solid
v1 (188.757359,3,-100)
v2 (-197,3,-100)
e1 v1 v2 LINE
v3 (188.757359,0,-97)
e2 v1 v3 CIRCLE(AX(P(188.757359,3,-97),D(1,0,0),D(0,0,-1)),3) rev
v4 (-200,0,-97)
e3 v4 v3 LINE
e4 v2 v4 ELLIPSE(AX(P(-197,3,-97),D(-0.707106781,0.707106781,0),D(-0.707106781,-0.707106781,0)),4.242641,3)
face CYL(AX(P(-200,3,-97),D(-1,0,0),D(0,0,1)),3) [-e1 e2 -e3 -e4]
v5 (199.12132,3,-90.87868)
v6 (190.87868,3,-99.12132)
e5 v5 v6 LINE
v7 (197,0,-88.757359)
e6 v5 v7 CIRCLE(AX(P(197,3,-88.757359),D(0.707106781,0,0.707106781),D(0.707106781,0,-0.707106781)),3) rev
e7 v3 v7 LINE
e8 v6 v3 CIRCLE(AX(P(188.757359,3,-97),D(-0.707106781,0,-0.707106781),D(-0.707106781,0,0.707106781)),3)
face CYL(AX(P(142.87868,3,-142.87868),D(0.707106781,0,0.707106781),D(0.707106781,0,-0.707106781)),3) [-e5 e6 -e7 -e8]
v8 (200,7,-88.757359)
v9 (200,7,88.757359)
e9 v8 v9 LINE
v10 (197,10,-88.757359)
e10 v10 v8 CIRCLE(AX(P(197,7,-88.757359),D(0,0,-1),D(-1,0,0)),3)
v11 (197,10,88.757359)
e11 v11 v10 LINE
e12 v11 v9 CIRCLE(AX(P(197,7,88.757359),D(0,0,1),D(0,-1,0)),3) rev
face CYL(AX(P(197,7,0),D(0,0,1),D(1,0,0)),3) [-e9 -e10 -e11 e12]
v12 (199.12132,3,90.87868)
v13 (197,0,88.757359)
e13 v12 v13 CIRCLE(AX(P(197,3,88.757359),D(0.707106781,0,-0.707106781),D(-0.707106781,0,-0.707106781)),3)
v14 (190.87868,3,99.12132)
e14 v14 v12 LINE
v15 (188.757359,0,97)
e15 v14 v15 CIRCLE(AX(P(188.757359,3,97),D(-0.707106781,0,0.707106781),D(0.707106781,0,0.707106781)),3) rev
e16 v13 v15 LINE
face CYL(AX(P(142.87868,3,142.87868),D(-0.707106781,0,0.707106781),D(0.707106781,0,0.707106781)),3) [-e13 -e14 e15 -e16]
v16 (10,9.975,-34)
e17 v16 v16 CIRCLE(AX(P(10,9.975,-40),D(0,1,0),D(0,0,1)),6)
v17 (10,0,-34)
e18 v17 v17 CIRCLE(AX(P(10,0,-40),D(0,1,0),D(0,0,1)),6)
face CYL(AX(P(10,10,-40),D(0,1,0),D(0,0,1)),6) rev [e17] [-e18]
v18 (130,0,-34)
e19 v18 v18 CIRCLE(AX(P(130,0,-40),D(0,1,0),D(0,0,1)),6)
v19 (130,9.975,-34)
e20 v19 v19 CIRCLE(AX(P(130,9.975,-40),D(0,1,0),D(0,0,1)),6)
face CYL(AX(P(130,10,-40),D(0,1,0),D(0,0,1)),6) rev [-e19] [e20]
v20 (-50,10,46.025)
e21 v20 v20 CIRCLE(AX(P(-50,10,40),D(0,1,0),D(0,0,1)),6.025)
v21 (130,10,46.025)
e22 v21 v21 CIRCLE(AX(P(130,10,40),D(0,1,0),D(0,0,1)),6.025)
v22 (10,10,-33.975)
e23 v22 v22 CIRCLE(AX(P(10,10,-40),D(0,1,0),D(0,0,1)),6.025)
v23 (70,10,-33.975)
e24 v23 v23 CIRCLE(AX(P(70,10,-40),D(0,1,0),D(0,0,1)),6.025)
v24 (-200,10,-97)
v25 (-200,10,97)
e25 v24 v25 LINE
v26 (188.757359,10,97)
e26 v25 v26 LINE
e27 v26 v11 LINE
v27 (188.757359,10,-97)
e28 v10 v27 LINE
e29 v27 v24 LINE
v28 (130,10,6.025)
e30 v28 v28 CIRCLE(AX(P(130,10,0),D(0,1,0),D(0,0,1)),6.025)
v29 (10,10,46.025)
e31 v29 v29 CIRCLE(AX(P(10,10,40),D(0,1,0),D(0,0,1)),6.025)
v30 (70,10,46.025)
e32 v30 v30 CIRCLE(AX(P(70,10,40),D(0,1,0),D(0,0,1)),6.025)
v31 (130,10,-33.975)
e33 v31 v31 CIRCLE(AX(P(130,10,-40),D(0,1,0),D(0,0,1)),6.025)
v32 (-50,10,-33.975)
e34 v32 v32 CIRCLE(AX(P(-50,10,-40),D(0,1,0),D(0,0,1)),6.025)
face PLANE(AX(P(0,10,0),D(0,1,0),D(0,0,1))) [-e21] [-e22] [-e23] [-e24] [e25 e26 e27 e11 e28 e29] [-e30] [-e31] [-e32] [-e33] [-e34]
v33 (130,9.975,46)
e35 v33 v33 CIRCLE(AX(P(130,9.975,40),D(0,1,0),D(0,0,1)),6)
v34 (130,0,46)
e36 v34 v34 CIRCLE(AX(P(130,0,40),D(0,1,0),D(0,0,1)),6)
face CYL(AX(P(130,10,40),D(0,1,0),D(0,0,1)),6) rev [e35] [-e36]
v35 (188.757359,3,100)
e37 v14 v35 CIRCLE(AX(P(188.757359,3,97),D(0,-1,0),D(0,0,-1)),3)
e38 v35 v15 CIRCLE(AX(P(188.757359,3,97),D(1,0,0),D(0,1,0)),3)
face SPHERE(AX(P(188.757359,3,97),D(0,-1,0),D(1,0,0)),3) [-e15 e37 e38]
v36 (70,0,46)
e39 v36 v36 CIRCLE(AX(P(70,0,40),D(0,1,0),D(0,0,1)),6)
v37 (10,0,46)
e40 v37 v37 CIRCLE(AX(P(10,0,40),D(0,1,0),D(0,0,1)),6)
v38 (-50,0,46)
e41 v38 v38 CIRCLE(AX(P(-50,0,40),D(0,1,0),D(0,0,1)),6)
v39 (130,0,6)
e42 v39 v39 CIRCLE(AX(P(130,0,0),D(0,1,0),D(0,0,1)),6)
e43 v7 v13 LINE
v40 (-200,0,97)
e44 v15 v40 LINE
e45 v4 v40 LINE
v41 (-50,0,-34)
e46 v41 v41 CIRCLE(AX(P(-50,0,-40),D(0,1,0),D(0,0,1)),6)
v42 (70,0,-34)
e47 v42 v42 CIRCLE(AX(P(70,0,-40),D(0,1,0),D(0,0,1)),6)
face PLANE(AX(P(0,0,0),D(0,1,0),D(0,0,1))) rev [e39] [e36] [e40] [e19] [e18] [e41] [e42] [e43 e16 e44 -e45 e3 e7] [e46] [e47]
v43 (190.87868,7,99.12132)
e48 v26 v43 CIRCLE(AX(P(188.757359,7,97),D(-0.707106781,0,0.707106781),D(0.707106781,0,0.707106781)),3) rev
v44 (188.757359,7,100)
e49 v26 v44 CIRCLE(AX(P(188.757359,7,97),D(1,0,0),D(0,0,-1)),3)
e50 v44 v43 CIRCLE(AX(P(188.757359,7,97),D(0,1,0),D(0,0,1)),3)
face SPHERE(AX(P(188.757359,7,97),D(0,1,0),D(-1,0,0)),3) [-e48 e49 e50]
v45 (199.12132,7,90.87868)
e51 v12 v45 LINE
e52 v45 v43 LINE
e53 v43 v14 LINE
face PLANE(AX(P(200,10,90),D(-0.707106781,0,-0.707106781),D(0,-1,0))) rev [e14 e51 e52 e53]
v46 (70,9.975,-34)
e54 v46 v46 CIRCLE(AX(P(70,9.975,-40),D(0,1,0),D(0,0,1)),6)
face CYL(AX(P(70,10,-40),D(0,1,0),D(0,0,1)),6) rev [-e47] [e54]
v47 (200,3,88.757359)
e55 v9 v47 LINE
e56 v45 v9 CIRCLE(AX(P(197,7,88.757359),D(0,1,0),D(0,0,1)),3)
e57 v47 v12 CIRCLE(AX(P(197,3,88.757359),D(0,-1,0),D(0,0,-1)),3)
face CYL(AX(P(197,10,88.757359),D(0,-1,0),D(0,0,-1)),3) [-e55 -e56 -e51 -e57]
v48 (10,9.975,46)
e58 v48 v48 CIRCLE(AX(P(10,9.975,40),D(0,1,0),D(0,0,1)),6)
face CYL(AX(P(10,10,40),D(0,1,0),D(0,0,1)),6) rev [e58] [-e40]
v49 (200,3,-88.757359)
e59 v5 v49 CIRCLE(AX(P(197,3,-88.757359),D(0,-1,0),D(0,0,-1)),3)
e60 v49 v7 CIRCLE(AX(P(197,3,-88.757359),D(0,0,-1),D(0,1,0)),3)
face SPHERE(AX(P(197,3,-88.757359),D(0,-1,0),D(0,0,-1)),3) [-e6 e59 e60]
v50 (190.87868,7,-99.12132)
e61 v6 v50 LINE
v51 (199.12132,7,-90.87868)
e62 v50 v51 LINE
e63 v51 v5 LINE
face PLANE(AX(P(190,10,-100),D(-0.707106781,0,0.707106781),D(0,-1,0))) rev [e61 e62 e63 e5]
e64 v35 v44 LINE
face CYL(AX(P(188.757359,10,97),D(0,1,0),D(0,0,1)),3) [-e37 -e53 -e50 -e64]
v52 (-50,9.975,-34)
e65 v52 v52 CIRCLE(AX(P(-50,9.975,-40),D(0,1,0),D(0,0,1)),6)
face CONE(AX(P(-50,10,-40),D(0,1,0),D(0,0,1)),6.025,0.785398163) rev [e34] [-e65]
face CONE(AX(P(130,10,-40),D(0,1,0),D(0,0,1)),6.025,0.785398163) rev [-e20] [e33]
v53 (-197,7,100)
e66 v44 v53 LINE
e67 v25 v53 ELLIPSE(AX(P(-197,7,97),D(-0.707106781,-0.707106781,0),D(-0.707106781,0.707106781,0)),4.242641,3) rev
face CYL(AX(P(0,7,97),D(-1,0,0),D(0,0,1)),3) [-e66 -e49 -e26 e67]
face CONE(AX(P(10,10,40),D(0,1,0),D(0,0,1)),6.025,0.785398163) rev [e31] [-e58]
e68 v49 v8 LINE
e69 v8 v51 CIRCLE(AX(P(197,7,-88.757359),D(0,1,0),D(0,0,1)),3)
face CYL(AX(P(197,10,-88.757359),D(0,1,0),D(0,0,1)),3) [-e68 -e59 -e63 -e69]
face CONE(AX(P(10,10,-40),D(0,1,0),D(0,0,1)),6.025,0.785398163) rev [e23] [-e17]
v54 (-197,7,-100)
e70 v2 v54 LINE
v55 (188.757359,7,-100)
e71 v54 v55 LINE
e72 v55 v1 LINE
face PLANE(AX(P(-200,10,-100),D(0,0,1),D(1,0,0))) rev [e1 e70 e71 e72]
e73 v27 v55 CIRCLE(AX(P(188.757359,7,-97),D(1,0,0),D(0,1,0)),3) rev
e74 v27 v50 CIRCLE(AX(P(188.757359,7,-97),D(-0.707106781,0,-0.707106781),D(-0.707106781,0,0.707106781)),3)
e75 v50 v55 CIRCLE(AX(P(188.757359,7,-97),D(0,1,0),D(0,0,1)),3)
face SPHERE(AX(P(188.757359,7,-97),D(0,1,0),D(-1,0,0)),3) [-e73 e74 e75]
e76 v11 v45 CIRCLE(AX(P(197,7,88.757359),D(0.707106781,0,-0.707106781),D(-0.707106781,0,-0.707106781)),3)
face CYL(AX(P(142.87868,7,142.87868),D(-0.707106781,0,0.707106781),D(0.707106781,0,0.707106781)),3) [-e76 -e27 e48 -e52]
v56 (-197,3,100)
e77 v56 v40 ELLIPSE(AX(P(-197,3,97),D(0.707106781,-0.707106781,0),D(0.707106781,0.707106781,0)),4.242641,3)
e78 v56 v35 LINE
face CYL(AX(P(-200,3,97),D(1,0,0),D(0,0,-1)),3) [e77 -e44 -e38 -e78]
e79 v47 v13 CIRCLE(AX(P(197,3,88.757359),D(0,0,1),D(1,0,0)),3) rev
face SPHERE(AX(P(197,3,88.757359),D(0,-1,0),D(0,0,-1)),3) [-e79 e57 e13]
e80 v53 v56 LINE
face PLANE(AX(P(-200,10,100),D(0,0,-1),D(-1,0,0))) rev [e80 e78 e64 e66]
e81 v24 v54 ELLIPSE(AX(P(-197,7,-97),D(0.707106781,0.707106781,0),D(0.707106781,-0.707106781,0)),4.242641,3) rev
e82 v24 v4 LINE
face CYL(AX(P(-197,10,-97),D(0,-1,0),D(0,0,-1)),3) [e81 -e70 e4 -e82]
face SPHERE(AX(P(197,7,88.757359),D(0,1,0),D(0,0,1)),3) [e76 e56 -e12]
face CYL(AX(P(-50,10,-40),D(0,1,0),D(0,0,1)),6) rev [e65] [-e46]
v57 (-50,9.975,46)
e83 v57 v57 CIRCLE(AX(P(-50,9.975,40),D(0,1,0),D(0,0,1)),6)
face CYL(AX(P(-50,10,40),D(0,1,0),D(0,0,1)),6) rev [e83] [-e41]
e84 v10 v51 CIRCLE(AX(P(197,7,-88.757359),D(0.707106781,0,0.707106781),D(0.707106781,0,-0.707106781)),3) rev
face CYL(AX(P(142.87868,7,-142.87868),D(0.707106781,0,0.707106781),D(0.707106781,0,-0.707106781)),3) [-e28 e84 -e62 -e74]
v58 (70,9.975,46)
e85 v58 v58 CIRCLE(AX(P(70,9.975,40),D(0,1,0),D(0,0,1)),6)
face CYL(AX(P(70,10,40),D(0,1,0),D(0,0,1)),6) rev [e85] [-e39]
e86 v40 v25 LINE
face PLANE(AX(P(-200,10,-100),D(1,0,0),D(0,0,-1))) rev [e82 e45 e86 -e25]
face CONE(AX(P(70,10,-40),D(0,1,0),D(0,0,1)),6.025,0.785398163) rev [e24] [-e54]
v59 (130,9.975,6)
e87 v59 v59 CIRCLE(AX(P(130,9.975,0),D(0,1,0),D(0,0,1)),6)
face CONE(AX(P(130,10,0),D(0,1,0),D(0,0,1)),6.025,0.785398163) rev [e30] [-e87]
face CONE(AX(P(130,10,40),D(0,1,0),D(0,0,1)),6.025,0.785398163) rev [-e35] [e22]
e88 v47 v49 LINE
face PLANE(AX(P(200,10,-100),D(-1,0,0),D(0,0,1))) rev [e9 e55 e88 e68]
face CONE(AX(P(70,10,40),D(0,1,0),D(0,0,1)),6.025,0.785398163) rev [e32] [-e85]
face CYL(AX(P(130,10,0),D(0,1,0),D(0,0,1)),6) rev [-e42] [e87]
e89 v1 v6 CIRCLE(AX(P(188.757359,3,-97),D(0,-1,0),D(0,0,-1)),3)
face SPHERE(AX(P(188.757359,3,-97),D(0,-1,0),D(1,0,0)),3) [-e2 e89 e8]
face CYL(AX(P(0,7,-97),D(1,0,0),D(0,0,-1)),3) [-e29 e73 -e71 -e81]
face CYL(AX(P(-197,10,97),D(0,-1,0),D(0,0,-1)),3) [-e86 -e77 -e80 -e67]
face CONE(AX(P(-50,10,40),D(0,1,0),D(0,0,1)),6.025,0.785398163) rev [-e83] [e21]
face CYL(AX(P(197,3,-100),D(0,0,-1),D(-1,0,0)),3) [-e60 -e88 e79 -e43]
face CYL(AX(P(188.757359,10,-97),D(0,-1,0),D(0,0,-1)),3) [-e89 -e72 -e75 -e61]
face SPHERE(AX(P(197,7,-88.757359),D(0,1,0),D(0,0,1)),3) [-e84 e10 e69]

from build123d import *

# Parameters (mm, degrees)
SKETCH1_W                       = 400
SKETCH1_H                       = 200
BASE_FLANGE1_DEPTH              = 10
BREAK_CORNER1_DEPTH             = 10
M10_CLEARANCE_HOLE1_D           = 12
M10_CLEARANCE_HOLE1_CSINK_D     = 12.05
M10_CLEARANCE_HOLE1_CSINK_ANGLE = 90
FILLET1_R                       = 3


# Read off the part's stored shape, not the designer's step: Break-Corner1
# Sheet-metal steps are written as plain solids
with BuildPart() as part:
    # Sketch1 → Base-Flange1 (new body)
    with BuildSketch(Plane(origin=(0, 0, 0), x_dir=(1, 0, 0), z_dir=(0, 1, 0))):
        Rectangle(SKETCH1_W, SKETCH1_H)
    extrude(amount=BASE_FLANGE1_DEPTH)

    # Break-Corner1 outline → Break-Corner1 (cut)
    with BuildSketch(Plane(origin=(0, 0, 0), x_dir=(1, 0, 0), z_dir=(0, 1, 0))):
        Polygon((200, -100), (200, -90), (190, -100), align=None)
        Polygon((190, 100), (200, 90), (200, 100), align=None)
    extrude(amount=BREAK_CORNER1_DEPTH, mode=Mode.SUBTRACT)

    # M10 Clearance Hole1 (through all)
    with Locations(Plane(origin=(0, 10, 0), x_dir=(1, 0, 0), z_dir=(0, 1, 0))):
        with Locations((-50, 40), (10, 40), (70, 40), (130, 40), (130, 0), (130, -40), (70, -40), (10, -40), (-50, -40)):
            CounterSinkHole(M10_CLEARANCE_HOLE1_D / 2, M10_CLEARANCE_HOLE1_CSINK_D / 2, counter_sink_angle=M10_CLEARANCE_HOLE1_CSINK_ANGLE)

    # Fillet1
    fillet1_edges = [part.edges().sort_by_distance(p)[0] for p in [
        (200, 0, 0),
        (200, 10, 0),
        (200, 5, 90),
        (195, 0, 95),
        (190, 5, 100),
        (195, 10, 95),
        (-5, 0, -100),
        (-5, 10, -100),
        (190, 5, -100),
        (195, 0, -95),
        (200, 5, -90),
        (195, 10, -95),
        (-5, 0, 100),
        (-200, 5, -100),
        (-200, 5, 100),
        (-5, 10, 100),
    ]]
    fillet(fillet1_edges, radius=FILLET1_R)


solid = part.part
